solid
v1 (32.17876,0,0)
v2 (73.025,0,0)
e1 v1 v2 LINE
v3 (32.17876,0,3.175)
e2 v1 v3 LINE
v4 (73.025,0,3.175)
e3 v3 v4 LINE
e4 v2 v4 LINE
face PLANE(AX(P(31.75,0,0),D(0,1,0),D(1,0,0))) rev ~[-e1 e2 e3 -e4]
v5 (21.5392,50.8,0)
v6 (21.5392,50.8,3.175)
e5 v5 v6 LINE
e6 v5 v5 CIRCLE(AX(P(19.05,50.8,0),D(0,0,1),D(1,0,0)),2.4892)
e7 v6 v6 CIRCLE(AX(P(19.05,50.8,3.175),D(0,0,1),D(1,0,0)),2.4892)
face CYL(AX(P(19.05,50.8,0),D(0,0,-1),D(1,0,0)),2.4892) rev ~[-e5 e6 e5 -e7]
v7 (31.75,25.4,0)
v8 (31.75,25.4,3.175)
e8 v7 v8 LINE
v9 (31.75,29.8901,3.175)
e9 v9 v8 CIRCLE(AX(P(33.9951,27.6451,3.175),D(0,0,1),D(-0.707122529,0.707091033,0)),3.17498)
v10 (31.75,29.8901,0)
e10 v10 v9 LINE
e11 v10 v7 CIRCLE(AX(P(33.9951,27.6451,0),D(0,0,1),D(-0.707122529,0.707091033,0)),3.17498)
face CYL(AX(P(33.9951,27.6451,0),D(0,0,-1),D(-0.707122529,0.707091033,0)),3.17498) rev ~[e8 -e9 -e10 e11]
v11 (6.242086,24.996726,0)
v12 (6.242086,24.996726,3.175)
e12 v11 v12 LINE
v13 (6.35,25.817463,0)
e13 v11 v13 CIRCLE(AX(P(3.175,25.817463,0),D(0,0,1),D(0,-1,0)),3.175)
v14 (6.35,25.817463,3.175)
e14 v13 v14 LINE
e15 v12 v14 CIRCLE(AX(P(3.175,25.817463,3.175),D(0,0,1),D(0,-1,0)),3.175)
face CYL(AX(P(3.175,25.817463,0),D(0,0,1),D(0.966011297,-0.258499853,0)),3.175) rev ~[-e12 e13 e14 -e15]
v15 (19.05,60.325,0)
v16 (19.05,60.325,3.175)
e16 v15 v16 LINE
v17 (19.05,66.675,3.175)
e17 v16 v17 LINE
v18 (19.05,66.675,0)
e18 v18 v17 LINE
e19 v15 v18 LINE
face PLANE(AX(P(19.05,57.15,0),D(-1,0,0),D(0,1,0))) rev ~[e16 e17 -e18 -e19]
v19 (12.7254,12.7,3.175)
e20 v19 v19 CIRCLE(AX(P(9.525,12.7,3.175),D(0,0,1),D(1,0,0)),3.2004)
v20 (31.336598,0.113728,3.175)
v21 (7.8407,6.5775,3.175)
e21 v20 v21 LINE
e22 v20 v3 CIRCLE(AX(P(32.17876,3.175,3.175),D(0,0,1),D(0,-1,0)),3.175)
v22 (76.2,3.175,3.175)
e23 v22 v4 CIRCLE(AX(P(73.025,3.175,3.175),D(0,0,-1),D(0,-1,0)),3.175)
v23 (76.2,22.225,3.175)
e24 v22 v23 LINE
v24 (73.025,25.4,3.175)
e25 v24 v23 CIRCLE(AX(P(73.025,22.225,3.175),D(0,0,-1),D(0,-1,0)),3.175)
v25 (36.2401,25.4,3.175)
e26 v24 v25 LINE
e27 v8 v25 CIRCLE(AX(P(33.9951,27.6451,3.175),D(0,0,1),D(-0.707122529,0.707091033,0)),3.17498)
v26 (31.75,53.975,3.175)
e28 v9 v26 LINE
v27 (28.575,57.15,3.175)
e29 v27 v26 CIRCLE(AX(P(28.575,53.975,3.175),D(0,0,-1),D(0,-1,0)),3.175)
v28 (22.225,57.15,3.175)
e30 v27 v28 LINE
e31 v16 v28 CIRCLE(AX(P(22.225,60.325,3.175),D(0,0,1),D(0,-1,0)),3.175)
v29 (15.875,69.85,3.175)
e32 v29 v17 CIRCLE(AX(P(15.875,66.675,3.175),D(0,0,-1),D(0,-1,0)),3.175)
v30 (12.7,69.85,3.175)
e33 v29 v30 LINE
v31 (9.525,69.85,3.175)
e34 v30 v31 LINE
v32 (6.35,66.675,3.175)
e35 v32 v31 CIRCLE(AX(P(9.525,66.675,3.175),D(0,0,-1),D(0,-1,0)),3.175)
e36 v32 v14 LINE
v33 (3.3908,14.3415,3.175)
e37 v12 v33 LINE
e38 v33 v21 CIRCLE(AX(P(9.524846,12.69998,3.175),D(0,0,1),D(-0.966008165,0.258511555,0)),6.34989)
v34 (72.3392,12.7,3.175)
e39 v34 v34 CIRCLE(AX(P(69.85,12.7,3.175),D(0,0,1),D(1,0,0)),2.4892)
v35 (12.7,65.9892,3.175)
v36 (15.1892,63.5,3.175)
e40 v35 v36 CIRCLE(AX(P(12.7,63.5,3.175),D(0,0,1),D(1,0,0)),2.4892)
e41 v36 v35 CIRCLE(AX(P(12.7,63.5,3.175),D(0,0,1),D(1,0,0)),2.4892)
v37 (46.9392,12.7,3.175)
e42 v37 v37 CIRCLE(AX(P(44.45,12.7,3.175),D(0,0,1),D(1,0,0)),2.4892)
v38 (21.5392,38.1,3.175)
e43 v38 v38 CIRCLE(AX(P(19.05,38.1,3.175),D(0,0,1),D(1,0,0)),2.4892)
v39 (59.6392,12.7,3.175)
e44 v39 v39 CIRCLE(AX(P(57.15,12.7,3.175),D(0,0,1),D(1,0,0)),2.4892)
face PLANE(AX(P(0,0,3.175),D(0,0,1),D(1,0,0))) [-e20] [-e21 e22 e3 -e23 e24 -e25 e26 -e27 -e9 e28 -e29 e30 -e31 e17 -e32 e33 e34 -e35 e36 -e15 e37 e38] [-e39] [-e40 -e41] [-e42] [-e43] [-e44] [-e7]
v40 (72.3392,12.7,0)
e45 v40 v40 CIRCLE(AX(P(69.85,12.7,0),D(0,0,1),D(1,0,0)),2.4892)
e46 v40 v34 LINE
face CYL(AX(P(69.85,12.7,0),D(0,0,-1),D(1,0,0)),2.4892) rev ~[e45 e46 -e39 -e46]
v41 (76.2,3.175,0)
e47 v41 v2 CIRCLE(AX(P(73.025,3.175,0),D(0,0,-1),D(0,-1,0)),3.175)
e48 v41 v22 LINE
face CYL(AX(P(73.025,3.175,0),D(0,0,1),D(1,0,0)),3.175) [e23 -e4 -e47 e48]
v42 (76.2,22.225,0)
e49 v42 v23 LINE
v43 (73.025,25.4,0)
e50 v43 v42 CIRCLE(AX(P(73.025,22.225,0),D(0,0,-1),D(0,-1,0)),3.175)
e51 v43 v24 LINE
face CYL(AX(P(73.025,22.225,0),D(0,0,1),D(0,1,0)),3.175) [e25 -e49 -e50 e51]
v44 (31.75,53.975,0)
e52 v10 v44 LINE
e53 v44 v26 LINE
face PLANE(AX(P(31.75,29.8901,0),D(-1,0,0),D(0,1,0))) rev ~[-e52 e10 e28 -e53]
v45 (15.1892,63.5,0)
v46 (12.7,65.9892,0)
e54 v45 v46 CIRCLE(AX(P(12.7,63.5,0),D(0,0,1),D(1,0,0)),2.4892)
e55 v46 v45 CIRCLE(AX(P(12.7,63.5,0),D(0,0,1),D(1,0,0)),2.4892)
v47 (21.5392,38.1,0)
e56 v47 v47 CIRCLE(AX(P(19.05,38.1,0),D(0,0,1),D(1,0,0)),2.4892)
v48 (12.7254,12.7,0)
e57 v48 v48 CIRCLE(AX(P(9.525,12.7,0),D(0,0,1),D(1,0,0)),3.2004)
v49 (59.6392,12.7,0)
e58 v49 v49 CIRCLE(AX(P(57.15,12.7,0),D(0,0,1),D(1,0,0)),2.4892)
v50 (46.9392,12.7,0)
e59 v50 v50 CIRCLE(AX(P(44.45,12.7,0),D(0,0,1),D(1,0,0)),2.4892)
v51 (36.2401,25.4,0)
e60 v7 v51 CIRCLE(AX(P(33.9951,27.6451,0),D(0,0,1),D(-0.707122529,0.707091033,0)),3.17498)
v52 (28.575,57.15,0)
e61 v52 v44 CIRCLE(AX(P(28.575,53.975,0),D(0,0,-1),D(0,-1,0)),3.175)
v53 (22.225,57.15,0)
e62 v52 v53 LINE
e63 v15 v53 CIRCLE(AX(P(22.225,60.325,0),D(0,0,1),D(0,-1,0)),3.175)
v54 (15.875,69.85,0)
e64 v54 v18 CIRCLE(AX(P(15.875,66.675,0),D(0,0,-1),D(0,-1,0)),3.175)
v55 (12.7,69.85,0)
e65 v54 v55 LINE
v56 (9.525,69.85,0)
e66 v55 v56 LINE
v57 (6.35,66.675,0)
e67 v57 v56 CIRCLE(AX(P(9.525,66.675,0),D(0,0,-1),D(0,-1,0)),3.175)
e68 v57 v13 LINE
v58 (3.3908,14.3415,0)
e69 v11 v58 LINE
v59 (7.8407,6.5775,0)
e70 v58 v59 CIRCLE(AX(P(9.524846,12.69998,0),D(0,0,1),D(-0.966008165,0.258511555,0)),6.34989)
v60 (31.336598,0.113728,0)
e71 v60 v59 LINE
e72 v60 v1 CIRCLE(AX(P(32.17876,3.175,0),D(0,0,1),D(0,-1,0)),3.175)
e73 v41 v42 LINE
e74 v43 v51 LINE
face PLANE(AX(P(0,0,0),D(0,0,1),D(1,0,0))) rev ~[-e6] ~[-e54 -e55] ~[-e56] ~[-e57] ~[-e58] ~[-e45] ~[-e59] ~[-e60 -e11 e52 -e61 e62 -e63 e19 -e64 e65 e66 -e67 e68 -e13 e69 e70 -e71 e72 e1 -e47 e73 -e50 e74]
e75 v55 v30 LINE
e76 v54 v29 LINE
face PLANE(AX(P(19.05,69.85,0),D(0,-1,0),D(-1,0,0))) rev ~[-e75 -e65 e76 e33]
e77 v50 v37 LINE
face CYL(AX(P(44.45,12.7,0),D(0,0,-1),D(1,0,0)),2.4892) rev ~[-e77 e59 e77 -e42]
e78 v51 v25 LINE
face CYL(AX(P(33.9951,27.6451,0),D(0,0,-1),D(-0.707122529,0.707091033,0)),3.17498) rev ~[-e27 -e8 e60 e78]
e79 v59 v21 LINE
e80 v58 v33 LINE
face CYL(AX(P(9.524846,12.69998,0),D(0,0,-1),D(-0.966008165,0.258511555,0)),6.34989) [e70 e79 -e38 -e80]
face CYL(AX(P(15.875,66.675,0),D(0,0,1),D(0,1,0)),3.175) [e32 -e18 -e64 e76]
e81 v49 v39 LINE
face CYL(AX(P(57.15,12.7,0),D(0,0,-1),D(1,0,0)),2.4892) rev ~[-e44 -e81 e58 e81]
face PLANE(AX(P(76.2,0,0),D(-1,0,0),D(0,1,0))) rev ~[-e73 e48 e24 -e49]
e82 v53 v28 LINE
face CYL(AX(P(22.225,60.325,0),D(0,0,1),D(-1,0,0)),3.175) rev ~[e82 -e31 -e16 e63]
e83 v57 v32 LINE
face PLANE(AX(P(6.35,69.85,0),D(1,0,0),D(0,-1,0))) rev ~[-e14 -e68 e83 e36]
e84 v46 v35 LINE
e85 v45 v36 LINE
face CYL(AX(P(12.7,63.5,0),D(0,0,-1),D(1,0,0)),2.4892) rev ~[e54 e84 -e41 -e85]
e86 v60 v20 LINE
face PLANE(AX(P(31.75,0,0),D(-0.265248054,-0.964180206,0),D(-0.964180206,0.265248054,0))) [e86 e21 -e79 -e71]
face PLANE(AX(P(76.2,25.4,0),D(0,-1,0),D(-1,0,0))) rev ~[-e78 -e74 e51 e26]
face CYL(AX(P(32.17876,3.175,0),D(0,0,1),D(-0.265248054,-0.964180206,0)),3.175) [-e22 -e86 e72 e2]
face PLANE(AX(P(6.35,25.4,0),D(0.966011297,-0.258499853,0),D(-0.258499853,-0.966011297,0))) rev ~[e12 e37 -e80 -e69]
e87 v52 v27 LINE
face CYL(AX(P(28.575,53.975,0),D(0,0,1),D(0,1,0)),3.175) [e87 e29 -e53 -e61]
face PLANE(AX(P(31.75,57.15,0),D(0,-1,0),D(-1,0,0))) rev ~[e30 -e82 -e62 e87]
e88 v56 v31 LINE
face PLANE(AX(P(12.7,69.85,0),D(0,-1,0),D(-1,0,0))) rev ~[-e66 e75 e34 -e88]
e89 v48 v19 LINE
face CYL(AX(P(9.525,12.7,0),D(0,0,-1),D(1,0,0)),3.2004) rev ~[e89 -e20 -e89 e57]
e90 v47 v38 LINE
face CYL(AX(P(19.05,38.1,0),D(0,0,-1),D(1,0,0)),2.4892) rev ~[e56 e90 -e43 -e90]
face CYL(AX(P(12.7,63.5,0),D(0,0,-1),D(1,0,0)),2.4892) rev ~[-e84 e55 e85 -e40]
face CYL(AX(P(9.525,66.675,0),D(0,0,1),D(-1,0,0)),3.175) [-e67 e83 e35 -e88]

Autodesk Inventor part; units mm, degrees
ref_plane "YZ Plane" through (0, 0, 0) normal (1, 0, 0) x (0, 1, 0)
ref_plane "XZ Plane" through (0, 0, 0) normal (0, 1, 0) x (-1, 0, 0)
ref_plane "XY Plane" through (0, 0, 0) normal (0, 0, 1) x (1, 0, 0)
sketch "Sketch1" plane through (0, 0, 0) normal (0, 0, 1) x (1, 0, 0)
  line L0 (0, 0) -> (0, 13.4062)
  line L1 (0, 0) -> (20.3742, 0)
  circle A0 centre (9.525, 12.7) radius 9.525 construction
  circle A1 centre (9.525, 12.7) radius 3.2004
  line L2 (31.75, 0) -> (7.8407, 6.5775)
  arc A2 (3.3908, 14.3415) -> (7.8407, 6.5775) centre (9.525, 12.7) ccw
  line L3 (31.75, 0) -> (76.2, 0)
  line L4 (76.2, 0) -> (76.2, 25.4)
  line L5 (76.2, 25.4) -> (31.75, 25.4)
  line L6 (31.75, 25.4) -> (31.75, 57.15)
  line L7 (31.75, 57.15) -> (19.05, 57.15)
  line L8 (19.05, 57.15) -> (19.05, 69.85)
  line L9 (19.05, 69.85) -> (6.35, 69.85)
  line L10 (6.35, 69.85) -> (6.35, 25.4)
  line L11 (6.35, 25.4) -> (3.3908, 14.3415)
  circle A3 centre (12.7, 63.5) radius 2.4892
  line L12 (12.7, 69.85) -> (12.7, 63.5)
  circle A4 centre (44.45, 12.7) radius 2.4892
  circle A5 centre (57.15, 12.7) radius 2.4892
  circle A6 centre (69.85, 12.7) radius 2.4892
  circle A7 centre (19.05, 38.1) radius 2.4892
  circle A8 centre (19.05, 50.8) radius 2.4892
  line L13 (19.05, 50.8) -> (19.05, 38.1) construction
  arc A9 (31.75, 29.8901) -> (36.2401, 25.4) centre (33.9951, 27.6451) ccw
  circle A10 centre (31.2867, 27.5124) radius 0.4633 construction
  circle A11 centre (33.8624, 24.9367) radius 0.4633 construction
  line L14 (31.75, 25.4) -> (31.2867, 27.5124) construction
  line L15 (31.75, 25.4) -> (33.8624, 24.9367) construction
  point P0 (76.2, 12.7)
  dimension "d0" = 19.05
  dimension "d1" = 3.175
  dimension "d2" = 6.4008
  dimension "d6" = 12.7
  dimension "d7" = 25.4
  dimension "d8" = 4.9784
  dimension "d16" = 6.35
  dimension "d17" = 25.4
  dimension "d19" = 6.35
  dimension "d24" = 12.7
  dimension "d29" = 6.35
  dimension "d30" = 12.7
  dimension "d35" = 12.7
  dimension "d36" = 12.7
  dimension "d37" = 12.7
  dimension "d38" = 6.35
  dimension "d39" = 12.7
  dimension "d40" = 6.35
extrude "Extrusion1" add sketch "Sketch1" along normal blind 3.175 contours L2 A2 L11 L10 L9 L8 L7 L6 A9 L5 L4 L3
fillet "Fillet1" radius 3.175 8 edges at (6.35, 69.85, 1.5875) (19.05, 69.85, 1.5875) (76.2, 25.4, 1.5875) (76.2, 0, 1.5875) (6.35, 25.4, 1.5875) (31.75, 0, 1.5875) (31.75, 57.15, 1.5875) (19.05, 57.15, 1.5875)
equation "\"d24\" = d11"
equation "\"d11\" = 12.7"
properties part number "Bottom Bearing Plate (R4 - 0.25in Between Stages)" material "Aluminum 6061"
